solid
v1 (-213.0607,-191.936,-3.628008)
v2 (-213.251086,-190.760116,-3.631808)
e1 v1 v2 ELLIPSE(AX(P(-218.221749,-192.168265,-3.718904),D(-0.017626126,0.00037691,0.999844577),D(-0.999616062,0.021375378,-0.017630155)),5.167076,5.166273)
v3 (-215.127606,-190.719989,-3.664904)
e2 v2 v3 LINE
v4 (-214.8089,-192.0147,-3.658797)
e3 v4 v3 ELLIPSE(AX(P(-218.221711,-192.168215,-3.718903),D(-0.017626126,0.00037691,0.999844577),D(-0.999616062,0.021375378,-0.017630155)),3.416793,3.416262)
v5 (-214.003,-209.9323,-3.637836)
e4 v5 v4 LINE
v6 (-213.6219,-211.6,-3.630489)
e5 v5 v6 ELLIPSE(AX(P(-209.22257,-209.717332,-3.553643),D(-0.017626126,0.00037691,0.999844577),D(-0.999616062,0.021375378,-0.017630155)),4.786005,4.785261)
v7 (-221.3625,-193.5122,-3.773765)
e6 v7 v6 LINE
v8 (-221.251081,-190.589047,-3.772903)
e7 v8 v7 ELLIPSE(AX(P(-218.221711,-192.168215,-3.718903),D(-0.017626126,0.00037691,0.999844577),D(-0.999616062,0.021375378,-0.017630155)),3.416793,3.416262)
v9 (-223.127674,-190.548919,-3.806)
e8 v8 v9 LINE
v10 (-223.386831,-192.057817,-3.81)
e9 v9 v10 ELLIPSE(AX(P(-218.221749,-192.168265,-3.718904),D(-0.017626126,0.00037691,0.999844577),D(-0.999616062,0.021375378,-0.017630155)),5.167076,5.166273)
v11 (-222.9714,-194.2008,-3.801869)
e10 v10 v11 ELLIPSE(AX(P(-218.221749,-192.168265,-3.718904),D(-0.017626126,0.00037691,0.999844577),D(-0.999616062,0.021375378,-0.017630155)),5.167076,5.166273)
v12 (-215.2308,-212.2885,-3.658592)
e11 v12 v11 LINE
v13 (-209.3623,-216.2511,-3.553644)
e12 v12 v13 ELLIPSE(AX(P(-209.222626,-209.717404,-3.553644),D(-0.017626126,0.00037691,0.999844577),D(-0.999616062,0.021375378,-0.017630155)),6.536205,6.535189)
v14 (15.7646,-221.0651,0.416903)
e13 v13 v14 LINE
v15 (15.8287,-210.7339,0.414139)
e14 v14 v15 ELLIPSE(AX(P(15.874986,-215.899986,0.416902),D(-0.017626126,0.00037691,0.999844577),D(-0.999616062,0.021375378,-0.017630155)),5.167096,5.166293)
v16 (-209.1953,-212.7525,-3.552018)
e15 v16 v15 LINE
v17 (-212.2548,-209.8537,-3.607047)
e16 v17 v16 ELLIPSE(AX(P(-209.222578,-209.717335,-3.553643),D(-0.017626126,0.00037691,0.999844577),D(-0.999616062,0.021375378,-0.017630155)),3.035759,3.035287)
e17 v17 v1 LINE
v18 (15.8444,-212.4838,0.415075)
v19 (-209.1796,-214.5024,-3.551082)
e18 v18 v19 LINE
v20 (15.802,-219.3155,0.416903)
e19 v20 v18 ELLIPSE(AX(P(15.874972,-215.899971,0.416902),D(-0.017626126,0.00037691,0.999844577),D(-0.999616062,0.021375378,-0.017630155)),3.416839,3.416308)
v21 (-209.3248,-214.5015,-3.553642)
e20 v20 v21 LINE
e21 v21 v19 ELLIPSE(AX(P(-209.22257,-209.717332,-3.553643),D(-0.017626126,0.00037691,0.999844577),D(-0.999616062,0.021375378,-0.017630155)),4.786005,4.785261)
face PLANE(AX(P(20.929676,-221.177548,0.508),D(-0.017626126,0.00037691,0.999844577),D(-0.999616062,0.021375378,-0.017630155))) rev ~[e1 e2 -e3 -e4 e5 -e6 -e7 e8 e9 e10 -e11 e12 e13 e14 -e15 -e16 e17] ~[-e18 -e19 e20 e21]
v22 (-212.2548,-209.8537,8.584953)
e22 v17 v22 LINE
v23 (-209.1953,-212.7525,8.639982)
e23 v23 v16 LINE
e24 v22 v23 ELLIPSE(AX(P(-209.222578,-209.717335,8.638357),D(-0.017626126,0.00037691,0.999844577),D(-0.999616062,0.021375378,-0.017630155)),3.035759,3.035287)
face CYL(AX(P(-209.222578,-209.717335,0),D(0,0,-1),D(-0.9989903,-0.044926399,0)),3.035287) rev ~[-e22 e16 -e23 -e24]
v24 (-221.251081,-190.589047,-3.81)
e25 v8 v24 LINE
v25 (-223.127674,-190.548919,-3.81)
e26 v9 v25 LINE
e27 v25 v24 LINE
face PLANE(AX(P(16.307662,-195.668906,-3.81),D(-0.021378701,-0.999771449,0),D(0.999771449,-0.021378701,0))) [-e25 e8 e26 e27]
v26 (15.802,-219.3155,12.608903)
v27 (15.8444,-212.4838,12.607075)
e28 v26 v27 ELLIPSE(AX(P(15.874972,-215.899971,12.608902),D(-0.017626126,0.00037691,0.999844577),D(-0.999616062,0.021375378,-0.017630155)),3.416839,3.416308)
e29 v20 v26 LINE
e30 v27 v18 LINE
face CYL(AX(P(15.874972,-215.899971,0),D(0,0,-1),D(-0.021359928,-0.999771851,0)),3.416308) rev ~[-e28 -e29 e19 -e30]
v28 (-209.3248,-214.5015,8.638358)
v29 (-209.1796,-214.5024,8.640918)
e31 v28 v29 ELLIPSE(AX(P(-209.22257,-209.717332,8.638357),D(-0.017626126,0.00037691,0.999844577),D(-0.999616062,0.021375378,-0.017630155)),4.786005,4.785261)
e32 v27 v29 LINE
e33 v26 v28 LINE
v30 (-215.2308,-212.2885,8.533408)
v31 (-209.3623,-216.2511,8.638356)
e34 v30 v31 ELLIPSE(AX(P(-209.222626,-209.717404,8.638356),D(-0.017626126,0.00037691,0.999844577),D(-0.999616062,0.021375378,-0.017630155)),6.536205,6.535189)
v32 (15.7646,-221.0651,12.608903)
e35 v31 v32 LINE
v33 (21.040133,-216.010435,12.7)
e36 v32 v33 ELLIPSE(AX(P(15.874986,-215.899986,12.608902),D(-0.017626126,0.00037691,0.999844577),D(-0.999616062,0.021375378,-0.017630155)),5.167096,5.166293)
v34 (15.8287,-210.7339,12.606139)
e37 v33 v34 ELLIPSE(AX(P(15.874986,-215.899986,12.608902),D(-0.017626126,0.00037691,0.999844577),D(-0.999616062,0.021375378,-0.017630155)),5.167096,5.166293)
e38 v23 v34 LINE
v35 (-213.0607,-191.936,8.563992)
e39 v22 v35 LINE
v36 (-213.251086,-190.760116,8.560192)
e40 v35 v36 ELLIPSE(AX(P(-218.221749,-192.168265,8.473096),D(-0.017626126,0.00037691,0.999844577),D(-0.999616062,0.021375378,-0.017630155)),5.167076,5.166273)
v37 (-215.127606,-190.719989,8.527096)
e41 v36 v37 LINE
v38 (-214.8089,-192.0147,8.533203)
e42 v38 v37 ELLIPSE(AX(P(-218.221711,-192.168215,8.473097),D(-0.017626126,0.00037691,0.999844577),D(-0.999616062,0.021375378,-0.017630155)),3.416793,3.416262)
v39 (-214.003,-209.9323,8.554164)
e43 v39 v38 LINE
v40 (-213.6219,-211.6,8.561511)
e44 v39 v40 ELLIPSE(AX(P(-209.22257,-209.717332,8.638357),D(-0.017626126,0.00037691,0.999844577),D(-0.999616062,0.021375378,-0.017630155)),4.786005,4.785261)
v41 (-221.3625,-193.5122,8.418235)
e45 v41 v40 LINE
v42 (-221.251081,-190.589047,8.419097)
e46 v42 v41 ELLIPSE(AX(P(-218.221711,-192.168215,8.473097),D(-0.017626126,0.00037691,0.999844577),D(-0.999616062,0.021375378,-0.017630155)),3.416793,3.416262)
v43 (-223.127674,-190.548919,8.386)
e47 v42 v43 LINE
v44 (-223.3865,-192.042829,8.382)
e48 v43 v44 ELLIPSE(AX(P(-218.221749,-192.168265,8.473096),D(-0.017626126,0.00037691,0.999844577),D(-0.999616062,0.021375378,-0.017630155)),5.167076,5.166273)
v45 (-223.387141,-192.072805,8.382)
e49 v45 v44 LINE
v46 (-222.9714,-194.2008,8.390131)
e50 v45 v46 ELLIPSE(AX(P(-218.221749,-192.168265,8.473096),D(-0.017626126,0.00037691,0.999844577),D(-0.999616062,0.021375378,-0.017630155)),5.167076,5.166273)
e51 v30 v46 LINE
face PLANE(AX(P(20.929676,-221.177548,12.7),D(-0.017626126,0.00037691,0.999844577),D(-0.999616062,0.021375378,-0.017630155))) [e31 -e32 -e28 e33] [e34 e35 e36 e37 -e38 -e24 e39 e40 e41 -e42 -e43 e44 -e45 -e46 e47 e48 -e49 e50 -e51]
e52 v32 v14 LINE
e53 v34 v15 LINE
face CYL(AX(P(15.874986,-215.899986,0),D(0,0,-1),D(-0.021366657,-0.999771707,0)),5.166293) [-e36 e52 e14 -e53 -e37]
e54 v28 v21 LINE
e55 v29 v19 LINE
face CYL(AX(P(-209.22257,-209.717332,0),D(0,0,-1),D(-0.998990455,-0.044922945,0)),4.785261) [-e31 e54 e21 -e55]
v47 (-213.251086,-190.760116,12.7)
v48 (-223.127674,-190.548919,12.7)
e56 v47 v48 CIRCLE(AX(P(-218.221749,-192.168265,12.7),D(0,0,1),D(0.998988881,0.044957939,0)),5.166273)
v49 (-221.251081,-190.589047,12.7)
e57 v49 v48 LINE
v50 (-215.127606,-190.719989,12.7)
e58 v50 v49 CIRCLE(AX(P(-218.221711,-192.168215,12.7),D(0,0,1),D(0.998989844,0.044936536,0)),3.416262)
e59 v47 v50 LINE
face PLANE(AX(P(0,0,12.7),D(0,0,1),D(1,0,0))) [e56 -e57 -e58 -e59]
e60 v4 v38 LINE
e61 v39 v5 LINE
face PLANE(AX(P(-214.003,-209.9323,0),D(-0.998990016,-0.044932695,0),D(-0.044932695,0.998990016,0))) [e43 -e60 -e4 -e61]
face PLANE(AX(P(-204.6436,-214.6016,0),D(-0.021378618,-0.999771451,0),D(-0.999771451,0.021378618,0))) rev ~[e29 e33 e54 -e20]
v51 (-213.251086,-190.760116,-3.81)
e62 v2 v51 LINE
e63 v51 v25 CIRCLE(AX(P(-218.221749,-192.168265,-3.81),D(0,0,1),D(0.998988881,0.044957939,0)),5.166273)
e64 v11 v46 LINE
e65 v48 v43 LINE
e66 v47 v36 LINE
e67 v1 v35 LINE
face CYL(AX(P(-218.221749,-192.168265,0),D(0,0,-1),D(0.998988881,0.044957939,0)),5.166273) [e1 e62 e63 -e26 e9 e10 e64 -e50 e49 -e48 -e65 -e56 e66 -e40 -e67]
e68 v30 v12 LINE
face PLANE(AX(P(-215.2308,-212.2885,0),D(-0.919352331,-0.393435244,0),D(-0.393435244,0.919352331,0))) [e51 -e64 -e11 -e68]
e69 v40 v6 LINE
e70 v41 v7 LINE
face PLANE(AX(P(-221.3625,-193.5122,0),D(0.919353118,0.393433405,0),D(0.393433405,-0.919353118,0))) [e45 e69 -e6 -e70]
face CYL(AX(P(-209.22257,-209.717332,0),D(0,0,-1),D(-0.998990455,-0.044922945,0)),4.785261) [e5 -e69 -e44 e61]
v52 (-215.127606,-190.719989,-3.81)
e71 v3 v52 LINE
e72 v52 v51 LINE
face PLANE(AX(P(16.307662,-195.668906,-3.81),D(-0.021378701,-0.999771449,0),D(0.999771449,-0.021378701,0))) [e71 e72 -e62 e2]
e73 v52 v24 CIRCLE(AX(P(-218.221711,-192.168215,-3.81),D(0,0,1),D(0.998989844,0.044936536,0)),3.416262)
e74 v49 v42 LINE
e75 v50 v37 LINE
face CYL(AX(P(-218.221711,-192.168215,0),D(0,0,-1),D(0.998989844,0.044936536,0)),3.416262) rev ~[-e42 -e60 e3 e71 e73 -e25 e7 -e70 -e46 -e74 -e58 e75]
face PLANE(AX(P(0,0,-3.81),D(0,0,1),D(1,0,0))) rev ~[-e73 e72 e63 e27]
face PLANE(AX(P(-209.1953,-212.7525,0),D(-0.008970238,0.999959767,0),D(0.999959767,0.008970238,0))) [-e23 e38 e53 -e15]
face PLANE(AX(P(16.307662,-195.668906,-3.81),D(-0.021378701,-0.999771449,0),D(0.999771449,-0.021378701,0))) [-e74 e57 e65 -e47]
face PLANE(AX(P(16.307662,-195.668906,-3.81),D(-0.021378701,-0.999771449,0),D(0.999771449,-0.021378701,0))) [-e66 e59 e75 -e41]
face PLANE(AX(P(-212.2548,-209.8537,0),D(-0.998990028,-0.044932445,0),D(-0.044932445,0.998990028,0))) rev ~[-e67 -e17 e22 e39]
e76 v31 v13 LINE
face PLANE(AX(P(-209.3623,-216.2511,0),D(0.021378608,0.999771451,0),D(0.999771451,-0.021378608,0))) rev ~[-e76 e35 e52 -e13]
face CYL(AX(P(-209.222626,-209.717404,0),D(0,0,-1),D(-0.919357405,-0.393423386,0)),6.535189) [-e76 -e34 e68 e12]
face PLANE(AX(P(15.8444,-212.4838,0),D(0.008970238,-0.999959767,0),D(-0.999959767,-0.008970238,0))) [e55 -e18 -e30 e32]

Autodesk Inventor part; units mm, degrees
ref_plane "YZ Plane" through (0, 0, 0) normal (1, 0, 0) x (0, 1, 0)
ref_plane "XZ Plane" through (0, 0, 0) normal (0, 1, 0) x (-1, 0, 0)
ref_plane "XY Plane" through (0, 0, 0) normal (0, 0, 1) x (1, 0, 0)
sketch "Sketch1" plane through (0, 0, 0) normal (0, 0, 1) x (1, 0, 0)
  circle A0 centre (-218.2217, -192.1682) radius 3.0353 construction
  circle A1 centre (-209.2225, -209.7173) radius 3.0353 construction
  circle A2 centre (15.875, -215.9) radius 3.0353 construction
  arc A3 (-212.2548, -209.8537) -> (-209.1953, -212.7525) centre (-209.2225, -209.7173) ccw
  arc A4 (-214.8089, -192.0147) -> (-221.3625, -193.5122) centre (-218.2217, -192.1682) ccw
  arc A5 (-213.0607, -191.936) -> (-222.9714, -194.2008) centre (-218.2217, -192.1682) ccw
  arc A6 (15.802, -219.3155) -> (15.8444, -212.4838) centre (15.875, -215.9) ccw
  arc A7 (15.7646, -221.0651) -> (15.8287, -210.7339) centre (15.875, -215.9) ccw
  line L0 (-212.2548, -209.8537) -> (-213.0607, -191.936)
  line L1 (-215.2308, -212.2885) -> (-222.9714, -194.2008)
  line L2 (-221.3625, -193.5122) -> (-213.6219, -211.6)
  line L3 (-214.003, -209.9323) -> (-214.8089, -192.0147)
  line L4 (-209.1953, -212.7525) -> (15.8287, -210.7339)
  line L5 (15.8444, -212.4838) -> (-209.1796, -214.5024)
  line L6 (15.802, -219.3155) -> (-209.3248, -214.5015)
  line L7 (-209.3623, -216.2511) -> (15.7646, -221.0651)
  arc A8 (-214.003, -209.9323) -> (-209.1796, -214.5024) centre (-209.2225, -209.7173) ccw
  arc A9 (-215.2308, -212.2885) -> (-209.3623, -216.2511) centre (-209.2225, -209.7173) ccw
  arc A10 (-204.6436, -214.6016) -> (-204.4975, -214.4604) centre (-209.2225, -209.7173) ccw
  point P0 (0, 0)
  point P1 (-192.7723, -212.6051)
  point P2 (-183.4432, -220.9999)
  point P3 (-202.7453, -212.6946)
  point P4 (-199.5727, -216.4604)
  point P5 (-186.4, -216.7421)
  dimension "d0" = 0
  dimension "d2" = 0.381
  dimension "d3" = 1.75
  dimension "d9" = 1.75
  dimension "d10" = 1.75
  dimension "d11" = 0.381
  dimension "d12" = 1.75
extrude "main bands" add sketch "Sketch1" along normal blind 12.7 and the other way blind 3.81
sketch "Sketch2" plane through (15.7646, -221.0651, -3.81) normal (-0.0213787, -0.9997714, 0) x (0.9997714, -0.0213787, 0)
  line L0 (5.1663, 0) -> (5.1663, 16.51) projected
  line L1 (-225.1783, 16.51) -> (0, 16.51) projected
  line L2 (0, 0) -> (-225.1783, 0) projected
  line L3 (-239.7169, 0) -> (-239.7169, 16.51) projected
  line L4 (-239.7169, 0) -> (-229.3956, 0) projected
  line L5 (5.1663, 4.318) -> (-239.7169, 0)
  line L6 (0, 0) -> (5.1663, 0)
  line L7 (-239.7169, 0) -> (-225.1783, 0)
  line L8 (-229.3956, 16.51) -> (-239.7169, 16.51) projected
  line L9 (-239.7169, 16.51) -> (-225.1783, 16.51)
  line L10 (5.1663, 16.51) -> (0, 16.51)
  line L11 (5.1663, 16.51) -> (-239.7169, 12.192)
  point P0 (-20.487, 3.81)
  point P1 (-239.2557, 0)
  point P2 (-239.2557, 16.51)
  dimension "d17" = 4.318
  dimension "d18" = 4.318
extrude "diagonal cuts" cut sketch "Sketch2" against normal blind 25.4 contours L6 L2 L7 L4 L5 L0 | L11 L3 L8 L9 L1 L10
ref_plane "inside edge" through (0, 0, 0) normal (0, 0, -1) x (-1, 0, 0)
properties part number "Cata rubber bands"
